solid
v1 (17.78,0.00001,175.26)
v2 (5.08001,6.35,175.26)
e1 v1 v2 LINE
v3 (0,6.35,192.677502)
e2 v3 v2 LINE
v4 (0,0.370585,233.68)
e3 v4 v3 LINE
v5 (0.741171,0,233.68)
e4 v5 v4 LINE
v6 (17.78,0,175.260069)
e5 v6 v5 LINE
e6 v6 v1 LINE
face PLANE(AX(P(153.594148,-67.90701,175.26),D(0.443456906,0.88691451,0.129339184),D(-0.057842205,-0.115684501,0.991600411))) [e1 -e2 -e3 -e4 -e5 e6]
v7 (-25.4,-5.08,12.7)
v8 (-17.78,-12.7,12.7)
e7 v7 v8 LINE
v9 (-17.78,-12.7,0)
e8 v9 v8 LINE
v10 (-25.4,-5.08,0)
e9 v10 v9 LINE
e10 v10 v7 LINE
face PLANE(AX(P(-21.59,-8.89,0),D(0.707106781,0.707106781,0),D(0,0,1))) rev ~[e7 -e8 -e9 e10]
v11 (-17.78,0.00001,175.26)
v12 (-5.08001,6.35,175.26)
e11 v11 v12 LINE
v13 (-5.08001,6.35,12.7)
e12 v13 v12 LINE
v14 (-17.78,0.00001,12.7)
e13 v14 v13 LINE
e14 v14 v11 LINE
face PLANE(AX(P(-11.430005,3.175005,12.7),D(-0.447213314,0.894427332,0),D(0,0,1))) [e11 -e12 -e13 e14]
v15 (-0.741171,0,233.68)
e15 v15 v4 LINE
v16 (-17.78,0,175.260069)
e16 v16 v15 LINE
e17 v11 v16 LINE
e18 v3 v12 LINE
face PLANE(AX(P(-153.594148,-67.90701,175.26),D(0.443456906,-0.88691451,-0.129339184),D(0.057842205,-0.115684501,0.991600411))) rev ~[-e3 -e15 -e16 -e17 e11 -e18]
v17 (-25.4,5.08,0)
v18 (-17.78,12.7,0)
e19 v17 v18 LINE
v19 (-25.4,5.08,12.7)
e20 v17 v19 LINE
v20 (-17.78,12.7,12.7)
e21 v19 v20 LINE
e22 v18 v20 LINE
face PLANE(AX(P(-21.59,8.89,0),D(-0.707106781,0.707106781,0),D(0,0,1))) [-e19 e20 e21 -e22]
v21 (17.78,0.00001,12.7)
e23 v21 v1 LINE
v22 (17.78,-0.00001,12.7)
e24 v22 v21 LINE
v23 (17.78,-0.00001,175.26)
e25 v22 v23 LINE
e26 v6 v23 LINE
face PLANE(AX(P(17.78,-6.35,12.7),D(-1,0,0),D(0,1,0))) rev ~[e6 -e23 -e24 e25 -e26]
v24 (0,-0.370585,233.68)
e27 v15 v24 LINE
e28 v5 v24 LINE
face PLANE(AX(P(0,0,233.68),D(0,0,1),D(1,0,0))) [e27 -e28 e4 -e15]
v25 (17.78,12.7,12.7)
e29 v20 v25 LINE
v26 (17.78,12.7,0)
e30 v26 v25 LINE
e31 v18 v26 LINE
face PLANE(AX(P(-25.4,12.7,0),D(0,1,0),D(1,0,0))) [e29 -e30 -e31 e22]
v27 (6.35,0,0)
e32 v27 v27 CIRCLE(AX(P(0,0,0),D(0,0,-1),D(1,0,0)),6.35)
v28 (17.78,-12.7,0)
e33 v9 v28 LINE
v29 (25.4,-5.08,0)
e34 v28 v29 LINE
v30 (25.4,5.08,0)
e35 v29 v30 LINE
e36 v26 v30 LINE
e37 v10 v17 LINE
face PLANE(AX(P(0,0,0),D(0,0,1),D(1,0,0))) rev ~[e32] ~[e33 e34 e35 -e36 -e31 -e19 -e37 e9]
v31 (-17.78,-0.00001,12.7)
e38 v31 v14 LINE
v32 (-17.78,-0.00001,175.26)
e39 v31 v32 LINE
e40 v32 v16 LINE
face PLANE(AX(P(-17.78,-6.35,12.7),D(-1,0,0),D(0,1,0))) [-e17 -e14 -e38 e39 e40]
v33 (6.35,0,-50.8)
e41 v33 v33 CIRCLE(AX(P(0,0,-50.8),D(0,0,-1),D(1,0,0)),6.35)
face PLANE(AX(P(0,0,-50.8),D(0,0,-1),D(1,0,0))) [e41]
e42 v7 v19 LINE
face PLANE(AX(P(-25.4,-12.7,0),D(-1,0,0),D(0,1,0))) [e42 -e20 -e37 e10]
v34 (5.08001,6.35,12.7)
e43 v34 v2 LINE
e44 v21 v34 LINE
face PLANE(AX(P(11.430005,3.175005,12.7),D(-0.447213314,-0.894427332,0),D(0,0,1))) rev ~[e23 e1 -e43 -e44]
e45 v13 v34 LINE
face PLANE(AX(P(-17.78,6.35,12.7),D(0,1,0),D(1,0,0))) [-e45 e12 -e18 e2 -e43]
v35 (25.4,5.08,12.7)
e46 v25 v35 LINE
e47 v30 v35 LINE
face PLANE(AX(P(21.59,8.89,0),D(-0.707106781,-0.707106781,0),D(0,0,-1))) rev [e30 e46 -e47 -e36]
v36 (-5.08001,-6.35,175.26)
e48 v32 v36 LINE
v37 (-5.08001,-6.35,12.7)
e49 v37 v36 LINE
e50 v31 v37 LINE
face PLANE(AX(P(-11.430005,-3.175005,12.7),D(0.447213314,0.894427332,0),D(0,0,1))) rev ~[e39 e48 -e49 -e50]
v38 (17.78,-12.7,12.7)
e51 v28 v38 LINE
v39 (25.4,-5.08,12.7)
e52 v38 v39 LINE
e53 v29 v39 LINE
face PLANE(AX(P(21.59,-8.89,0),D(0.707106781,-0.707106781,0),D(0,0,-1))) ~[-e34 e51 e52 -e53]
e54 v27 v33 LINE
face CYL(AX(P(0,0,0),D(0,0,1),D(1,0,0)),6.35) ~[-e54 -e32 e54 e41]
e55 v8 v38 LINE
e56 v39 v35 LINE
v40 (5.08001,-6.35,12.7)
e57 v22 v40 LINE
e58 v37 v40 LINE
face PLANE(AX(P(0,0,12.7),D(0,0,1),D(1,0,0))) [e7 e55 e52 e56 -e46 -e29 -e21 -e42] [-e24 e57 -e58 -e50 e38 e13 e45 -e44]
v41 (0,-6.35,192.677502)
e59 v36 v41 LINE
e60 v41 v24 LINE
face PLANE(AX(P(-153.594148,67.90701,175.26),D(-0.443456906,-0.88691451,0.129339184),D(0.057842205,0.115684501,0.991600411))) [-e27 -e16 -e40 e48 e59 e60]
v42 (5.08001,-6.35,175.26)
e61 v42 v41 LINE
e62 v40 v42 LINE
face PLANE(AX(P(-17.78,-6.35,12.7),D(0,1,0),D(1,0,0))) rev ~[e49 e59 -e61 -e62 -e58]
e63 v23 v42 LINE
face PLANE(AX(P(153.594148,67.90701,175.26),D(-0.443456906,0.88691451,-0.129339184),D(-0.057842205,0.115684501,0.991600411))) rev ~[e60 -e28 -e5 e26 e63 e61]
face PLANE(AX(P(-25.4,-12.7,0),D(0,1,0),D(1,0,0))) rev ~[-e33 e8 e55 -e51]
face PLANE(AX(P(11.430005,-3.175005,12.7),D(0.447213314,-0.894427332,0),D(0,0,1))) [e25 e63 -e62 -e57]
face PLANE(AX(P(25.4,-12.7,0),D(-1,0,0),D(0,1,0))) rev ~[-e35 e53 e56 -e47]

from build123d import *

# Parameters (mm, degrees)
F0_W        = 50.8
F0_H        = 25.4
F1_DEPTH    = 12.7
F2_R        = 6.35
F3_DEPTH    = 50.8
F4_W        = 35.56
F4_H        = 12.7
F5_DEPTH    = 220.98
F6_SIZE2    = 12.69999
F6_SIZE     = 6.34999
F6_2_SIZE2  = 12.69999
F6_2_SIZE   = 6.34999
F7_T1_DEPTH = 317.8886374297
F7_T3_DEPTH = 317.8886374297
F7_T5_DEPTH = 317.8886374297
F7_T7_DEPTH = 317.8886374297
F8_SIZE2    = 7.62
F8_SIZE     = 7.62


# Not quite as in the source:
# - a fillet or chamfer that OpenCascade refuses, or shapes differently, is made with other operations: its cross-section is extruded or revolved along the edge and cut away or added
# - a fillet or chamfer is up to 0.001 mm smaller than in the source, because OpenCascade refuses the exact size


with BuildPart() as f1:
    # F0 (on Top) → F1 (new body)
    with BuildSketch(Plane.XY):
        Rectangle(F0_W, F0_H)
    extrude(amount=F1_DEPTH)

    # F2 (on face) → F3 (join)
    with BuildSketch(Plane(origin=(0, 0, 0), x_dir=(1, 0, 0), z_dir=(0, 0, -1))):
        Circle(F2_R)
    extrude(amount=F3_DEPTH)

    # F4 (on face) → F5 (join)
    with BuildSketch(Plane.XY.offset(12.7)):
        Rectangle(F4_W, F4_H)
    extrude(amount=F5_DEPTH)

    # F6 (size 6.35 and 12.7 in the source; OpenCascade refuses exactly that, so slightly less here)
    f6_edges = [f1.edges().sort_by_distance(p)[0] for p in [
        (17.78, -6.35, 123.19),
        (17.78, 6.35, 123.19),
    ]]
    f6_side = f1.faces().sort_by_distance((17.78, 0, 123.19))[0]
    chamfer(f6_edges, length=F6_SIZE, length2=F6_SIZE2, reference=f6_side)

    # F6#2 (size 6.35 and 12.7 in the source; OpenCascade refuses exactly that, so slightly less here)
    f6_2_edges = [f1.edges().sort_by_distance(p)[0] for p in [
        (-17.78, 6.35, 123.19),
        (-17.78, -6.35, 123.19),
    ]]
    f6_2_side = f1.faces().sort_by_distance((-17.78, 0, 123.19))[0]
    chamfer(f6_2_edges, length=F6_2_SIZE, length2=F6_2_SIZE2, reference=f6_2_side)

    # F7: chamfer of 7.62 x 58.42 on 4 edges, made by hand

    # F7_s2 → F7_t1 (cut)
    with BuildSketch(Plane(origin=(150.0381483816, -75.0190151206, 0), x_dir=(0, 0, 1), z_dir=(-0.8944273319, 0.4472133138, 0))):
        Polygon((175.26, 7.9514616635), (233.68, 0.3314616635), (233.68, 7.9514616635), align=None)
    extrude(amount=F7_T1_DEPTH, mode=Mode.SUBTRACT)

    # F7_s4 → F7_t3 (cut)
    with BuildSketch(Plane(origin=(150.0381483816, 75.0190151206, 0), x_dir=(0, 0, 1), z_dir=(-0.8944273319, -0.4472133138, 0))):
        Polygon((175.26, -7.9514616635), (233.68, -0.3314616635), (233.68, -7.9514616635), align=None)
    extrude(amount=F7_T3_DEPTH, mode=Mode.SUBTRACT)

    # F7_s6 → F7_t5 (cut)
    with BuildSketch(Plane(origin=(-150.0381483816, 75.0190151206, 0), x_dir=(0, 0, 1), z_dir=(0.8944273319, -0.4472133138, 0))):
        Polygon((175.26, 7.9514616635), (233.68, 0.3314616635), (233.68, 7.9514616635), align=None)
    extrude(amount=F7_T5_DEPTH, mode=Mode.SUBTRACT)

    # F7_s8 → F7_t7 (cut)
    with BuildSketch(Plane(origin=(-150.0381483816, -75.0190151206, 0), x_dir=(0, 0, 1), z_dir=(0.8944273319, 0.4472133138, 0))):
        Polygon((175.26, -7.9514616635), (233.68, -0.3314616635), (233.68, -7.9514616635), align=None)
    extrude(amount=F7_T7_DEPTH, mode=Mode.SUBTRACT)

    # F8
    f8_edges = [f1.edges().sort_by_distance(p)[0] for p in [
        (-25.4, -12.7, 6.35),
        (25.4, -12.7, 6.35),
        (25.4, 12.7, 6.35),
        (-25.4, 12.7, 6.35),
    ]]
    chamfer(f8_edges, length=F8_SIZE, length2=F8_SIZE2)


solid = f1.part
